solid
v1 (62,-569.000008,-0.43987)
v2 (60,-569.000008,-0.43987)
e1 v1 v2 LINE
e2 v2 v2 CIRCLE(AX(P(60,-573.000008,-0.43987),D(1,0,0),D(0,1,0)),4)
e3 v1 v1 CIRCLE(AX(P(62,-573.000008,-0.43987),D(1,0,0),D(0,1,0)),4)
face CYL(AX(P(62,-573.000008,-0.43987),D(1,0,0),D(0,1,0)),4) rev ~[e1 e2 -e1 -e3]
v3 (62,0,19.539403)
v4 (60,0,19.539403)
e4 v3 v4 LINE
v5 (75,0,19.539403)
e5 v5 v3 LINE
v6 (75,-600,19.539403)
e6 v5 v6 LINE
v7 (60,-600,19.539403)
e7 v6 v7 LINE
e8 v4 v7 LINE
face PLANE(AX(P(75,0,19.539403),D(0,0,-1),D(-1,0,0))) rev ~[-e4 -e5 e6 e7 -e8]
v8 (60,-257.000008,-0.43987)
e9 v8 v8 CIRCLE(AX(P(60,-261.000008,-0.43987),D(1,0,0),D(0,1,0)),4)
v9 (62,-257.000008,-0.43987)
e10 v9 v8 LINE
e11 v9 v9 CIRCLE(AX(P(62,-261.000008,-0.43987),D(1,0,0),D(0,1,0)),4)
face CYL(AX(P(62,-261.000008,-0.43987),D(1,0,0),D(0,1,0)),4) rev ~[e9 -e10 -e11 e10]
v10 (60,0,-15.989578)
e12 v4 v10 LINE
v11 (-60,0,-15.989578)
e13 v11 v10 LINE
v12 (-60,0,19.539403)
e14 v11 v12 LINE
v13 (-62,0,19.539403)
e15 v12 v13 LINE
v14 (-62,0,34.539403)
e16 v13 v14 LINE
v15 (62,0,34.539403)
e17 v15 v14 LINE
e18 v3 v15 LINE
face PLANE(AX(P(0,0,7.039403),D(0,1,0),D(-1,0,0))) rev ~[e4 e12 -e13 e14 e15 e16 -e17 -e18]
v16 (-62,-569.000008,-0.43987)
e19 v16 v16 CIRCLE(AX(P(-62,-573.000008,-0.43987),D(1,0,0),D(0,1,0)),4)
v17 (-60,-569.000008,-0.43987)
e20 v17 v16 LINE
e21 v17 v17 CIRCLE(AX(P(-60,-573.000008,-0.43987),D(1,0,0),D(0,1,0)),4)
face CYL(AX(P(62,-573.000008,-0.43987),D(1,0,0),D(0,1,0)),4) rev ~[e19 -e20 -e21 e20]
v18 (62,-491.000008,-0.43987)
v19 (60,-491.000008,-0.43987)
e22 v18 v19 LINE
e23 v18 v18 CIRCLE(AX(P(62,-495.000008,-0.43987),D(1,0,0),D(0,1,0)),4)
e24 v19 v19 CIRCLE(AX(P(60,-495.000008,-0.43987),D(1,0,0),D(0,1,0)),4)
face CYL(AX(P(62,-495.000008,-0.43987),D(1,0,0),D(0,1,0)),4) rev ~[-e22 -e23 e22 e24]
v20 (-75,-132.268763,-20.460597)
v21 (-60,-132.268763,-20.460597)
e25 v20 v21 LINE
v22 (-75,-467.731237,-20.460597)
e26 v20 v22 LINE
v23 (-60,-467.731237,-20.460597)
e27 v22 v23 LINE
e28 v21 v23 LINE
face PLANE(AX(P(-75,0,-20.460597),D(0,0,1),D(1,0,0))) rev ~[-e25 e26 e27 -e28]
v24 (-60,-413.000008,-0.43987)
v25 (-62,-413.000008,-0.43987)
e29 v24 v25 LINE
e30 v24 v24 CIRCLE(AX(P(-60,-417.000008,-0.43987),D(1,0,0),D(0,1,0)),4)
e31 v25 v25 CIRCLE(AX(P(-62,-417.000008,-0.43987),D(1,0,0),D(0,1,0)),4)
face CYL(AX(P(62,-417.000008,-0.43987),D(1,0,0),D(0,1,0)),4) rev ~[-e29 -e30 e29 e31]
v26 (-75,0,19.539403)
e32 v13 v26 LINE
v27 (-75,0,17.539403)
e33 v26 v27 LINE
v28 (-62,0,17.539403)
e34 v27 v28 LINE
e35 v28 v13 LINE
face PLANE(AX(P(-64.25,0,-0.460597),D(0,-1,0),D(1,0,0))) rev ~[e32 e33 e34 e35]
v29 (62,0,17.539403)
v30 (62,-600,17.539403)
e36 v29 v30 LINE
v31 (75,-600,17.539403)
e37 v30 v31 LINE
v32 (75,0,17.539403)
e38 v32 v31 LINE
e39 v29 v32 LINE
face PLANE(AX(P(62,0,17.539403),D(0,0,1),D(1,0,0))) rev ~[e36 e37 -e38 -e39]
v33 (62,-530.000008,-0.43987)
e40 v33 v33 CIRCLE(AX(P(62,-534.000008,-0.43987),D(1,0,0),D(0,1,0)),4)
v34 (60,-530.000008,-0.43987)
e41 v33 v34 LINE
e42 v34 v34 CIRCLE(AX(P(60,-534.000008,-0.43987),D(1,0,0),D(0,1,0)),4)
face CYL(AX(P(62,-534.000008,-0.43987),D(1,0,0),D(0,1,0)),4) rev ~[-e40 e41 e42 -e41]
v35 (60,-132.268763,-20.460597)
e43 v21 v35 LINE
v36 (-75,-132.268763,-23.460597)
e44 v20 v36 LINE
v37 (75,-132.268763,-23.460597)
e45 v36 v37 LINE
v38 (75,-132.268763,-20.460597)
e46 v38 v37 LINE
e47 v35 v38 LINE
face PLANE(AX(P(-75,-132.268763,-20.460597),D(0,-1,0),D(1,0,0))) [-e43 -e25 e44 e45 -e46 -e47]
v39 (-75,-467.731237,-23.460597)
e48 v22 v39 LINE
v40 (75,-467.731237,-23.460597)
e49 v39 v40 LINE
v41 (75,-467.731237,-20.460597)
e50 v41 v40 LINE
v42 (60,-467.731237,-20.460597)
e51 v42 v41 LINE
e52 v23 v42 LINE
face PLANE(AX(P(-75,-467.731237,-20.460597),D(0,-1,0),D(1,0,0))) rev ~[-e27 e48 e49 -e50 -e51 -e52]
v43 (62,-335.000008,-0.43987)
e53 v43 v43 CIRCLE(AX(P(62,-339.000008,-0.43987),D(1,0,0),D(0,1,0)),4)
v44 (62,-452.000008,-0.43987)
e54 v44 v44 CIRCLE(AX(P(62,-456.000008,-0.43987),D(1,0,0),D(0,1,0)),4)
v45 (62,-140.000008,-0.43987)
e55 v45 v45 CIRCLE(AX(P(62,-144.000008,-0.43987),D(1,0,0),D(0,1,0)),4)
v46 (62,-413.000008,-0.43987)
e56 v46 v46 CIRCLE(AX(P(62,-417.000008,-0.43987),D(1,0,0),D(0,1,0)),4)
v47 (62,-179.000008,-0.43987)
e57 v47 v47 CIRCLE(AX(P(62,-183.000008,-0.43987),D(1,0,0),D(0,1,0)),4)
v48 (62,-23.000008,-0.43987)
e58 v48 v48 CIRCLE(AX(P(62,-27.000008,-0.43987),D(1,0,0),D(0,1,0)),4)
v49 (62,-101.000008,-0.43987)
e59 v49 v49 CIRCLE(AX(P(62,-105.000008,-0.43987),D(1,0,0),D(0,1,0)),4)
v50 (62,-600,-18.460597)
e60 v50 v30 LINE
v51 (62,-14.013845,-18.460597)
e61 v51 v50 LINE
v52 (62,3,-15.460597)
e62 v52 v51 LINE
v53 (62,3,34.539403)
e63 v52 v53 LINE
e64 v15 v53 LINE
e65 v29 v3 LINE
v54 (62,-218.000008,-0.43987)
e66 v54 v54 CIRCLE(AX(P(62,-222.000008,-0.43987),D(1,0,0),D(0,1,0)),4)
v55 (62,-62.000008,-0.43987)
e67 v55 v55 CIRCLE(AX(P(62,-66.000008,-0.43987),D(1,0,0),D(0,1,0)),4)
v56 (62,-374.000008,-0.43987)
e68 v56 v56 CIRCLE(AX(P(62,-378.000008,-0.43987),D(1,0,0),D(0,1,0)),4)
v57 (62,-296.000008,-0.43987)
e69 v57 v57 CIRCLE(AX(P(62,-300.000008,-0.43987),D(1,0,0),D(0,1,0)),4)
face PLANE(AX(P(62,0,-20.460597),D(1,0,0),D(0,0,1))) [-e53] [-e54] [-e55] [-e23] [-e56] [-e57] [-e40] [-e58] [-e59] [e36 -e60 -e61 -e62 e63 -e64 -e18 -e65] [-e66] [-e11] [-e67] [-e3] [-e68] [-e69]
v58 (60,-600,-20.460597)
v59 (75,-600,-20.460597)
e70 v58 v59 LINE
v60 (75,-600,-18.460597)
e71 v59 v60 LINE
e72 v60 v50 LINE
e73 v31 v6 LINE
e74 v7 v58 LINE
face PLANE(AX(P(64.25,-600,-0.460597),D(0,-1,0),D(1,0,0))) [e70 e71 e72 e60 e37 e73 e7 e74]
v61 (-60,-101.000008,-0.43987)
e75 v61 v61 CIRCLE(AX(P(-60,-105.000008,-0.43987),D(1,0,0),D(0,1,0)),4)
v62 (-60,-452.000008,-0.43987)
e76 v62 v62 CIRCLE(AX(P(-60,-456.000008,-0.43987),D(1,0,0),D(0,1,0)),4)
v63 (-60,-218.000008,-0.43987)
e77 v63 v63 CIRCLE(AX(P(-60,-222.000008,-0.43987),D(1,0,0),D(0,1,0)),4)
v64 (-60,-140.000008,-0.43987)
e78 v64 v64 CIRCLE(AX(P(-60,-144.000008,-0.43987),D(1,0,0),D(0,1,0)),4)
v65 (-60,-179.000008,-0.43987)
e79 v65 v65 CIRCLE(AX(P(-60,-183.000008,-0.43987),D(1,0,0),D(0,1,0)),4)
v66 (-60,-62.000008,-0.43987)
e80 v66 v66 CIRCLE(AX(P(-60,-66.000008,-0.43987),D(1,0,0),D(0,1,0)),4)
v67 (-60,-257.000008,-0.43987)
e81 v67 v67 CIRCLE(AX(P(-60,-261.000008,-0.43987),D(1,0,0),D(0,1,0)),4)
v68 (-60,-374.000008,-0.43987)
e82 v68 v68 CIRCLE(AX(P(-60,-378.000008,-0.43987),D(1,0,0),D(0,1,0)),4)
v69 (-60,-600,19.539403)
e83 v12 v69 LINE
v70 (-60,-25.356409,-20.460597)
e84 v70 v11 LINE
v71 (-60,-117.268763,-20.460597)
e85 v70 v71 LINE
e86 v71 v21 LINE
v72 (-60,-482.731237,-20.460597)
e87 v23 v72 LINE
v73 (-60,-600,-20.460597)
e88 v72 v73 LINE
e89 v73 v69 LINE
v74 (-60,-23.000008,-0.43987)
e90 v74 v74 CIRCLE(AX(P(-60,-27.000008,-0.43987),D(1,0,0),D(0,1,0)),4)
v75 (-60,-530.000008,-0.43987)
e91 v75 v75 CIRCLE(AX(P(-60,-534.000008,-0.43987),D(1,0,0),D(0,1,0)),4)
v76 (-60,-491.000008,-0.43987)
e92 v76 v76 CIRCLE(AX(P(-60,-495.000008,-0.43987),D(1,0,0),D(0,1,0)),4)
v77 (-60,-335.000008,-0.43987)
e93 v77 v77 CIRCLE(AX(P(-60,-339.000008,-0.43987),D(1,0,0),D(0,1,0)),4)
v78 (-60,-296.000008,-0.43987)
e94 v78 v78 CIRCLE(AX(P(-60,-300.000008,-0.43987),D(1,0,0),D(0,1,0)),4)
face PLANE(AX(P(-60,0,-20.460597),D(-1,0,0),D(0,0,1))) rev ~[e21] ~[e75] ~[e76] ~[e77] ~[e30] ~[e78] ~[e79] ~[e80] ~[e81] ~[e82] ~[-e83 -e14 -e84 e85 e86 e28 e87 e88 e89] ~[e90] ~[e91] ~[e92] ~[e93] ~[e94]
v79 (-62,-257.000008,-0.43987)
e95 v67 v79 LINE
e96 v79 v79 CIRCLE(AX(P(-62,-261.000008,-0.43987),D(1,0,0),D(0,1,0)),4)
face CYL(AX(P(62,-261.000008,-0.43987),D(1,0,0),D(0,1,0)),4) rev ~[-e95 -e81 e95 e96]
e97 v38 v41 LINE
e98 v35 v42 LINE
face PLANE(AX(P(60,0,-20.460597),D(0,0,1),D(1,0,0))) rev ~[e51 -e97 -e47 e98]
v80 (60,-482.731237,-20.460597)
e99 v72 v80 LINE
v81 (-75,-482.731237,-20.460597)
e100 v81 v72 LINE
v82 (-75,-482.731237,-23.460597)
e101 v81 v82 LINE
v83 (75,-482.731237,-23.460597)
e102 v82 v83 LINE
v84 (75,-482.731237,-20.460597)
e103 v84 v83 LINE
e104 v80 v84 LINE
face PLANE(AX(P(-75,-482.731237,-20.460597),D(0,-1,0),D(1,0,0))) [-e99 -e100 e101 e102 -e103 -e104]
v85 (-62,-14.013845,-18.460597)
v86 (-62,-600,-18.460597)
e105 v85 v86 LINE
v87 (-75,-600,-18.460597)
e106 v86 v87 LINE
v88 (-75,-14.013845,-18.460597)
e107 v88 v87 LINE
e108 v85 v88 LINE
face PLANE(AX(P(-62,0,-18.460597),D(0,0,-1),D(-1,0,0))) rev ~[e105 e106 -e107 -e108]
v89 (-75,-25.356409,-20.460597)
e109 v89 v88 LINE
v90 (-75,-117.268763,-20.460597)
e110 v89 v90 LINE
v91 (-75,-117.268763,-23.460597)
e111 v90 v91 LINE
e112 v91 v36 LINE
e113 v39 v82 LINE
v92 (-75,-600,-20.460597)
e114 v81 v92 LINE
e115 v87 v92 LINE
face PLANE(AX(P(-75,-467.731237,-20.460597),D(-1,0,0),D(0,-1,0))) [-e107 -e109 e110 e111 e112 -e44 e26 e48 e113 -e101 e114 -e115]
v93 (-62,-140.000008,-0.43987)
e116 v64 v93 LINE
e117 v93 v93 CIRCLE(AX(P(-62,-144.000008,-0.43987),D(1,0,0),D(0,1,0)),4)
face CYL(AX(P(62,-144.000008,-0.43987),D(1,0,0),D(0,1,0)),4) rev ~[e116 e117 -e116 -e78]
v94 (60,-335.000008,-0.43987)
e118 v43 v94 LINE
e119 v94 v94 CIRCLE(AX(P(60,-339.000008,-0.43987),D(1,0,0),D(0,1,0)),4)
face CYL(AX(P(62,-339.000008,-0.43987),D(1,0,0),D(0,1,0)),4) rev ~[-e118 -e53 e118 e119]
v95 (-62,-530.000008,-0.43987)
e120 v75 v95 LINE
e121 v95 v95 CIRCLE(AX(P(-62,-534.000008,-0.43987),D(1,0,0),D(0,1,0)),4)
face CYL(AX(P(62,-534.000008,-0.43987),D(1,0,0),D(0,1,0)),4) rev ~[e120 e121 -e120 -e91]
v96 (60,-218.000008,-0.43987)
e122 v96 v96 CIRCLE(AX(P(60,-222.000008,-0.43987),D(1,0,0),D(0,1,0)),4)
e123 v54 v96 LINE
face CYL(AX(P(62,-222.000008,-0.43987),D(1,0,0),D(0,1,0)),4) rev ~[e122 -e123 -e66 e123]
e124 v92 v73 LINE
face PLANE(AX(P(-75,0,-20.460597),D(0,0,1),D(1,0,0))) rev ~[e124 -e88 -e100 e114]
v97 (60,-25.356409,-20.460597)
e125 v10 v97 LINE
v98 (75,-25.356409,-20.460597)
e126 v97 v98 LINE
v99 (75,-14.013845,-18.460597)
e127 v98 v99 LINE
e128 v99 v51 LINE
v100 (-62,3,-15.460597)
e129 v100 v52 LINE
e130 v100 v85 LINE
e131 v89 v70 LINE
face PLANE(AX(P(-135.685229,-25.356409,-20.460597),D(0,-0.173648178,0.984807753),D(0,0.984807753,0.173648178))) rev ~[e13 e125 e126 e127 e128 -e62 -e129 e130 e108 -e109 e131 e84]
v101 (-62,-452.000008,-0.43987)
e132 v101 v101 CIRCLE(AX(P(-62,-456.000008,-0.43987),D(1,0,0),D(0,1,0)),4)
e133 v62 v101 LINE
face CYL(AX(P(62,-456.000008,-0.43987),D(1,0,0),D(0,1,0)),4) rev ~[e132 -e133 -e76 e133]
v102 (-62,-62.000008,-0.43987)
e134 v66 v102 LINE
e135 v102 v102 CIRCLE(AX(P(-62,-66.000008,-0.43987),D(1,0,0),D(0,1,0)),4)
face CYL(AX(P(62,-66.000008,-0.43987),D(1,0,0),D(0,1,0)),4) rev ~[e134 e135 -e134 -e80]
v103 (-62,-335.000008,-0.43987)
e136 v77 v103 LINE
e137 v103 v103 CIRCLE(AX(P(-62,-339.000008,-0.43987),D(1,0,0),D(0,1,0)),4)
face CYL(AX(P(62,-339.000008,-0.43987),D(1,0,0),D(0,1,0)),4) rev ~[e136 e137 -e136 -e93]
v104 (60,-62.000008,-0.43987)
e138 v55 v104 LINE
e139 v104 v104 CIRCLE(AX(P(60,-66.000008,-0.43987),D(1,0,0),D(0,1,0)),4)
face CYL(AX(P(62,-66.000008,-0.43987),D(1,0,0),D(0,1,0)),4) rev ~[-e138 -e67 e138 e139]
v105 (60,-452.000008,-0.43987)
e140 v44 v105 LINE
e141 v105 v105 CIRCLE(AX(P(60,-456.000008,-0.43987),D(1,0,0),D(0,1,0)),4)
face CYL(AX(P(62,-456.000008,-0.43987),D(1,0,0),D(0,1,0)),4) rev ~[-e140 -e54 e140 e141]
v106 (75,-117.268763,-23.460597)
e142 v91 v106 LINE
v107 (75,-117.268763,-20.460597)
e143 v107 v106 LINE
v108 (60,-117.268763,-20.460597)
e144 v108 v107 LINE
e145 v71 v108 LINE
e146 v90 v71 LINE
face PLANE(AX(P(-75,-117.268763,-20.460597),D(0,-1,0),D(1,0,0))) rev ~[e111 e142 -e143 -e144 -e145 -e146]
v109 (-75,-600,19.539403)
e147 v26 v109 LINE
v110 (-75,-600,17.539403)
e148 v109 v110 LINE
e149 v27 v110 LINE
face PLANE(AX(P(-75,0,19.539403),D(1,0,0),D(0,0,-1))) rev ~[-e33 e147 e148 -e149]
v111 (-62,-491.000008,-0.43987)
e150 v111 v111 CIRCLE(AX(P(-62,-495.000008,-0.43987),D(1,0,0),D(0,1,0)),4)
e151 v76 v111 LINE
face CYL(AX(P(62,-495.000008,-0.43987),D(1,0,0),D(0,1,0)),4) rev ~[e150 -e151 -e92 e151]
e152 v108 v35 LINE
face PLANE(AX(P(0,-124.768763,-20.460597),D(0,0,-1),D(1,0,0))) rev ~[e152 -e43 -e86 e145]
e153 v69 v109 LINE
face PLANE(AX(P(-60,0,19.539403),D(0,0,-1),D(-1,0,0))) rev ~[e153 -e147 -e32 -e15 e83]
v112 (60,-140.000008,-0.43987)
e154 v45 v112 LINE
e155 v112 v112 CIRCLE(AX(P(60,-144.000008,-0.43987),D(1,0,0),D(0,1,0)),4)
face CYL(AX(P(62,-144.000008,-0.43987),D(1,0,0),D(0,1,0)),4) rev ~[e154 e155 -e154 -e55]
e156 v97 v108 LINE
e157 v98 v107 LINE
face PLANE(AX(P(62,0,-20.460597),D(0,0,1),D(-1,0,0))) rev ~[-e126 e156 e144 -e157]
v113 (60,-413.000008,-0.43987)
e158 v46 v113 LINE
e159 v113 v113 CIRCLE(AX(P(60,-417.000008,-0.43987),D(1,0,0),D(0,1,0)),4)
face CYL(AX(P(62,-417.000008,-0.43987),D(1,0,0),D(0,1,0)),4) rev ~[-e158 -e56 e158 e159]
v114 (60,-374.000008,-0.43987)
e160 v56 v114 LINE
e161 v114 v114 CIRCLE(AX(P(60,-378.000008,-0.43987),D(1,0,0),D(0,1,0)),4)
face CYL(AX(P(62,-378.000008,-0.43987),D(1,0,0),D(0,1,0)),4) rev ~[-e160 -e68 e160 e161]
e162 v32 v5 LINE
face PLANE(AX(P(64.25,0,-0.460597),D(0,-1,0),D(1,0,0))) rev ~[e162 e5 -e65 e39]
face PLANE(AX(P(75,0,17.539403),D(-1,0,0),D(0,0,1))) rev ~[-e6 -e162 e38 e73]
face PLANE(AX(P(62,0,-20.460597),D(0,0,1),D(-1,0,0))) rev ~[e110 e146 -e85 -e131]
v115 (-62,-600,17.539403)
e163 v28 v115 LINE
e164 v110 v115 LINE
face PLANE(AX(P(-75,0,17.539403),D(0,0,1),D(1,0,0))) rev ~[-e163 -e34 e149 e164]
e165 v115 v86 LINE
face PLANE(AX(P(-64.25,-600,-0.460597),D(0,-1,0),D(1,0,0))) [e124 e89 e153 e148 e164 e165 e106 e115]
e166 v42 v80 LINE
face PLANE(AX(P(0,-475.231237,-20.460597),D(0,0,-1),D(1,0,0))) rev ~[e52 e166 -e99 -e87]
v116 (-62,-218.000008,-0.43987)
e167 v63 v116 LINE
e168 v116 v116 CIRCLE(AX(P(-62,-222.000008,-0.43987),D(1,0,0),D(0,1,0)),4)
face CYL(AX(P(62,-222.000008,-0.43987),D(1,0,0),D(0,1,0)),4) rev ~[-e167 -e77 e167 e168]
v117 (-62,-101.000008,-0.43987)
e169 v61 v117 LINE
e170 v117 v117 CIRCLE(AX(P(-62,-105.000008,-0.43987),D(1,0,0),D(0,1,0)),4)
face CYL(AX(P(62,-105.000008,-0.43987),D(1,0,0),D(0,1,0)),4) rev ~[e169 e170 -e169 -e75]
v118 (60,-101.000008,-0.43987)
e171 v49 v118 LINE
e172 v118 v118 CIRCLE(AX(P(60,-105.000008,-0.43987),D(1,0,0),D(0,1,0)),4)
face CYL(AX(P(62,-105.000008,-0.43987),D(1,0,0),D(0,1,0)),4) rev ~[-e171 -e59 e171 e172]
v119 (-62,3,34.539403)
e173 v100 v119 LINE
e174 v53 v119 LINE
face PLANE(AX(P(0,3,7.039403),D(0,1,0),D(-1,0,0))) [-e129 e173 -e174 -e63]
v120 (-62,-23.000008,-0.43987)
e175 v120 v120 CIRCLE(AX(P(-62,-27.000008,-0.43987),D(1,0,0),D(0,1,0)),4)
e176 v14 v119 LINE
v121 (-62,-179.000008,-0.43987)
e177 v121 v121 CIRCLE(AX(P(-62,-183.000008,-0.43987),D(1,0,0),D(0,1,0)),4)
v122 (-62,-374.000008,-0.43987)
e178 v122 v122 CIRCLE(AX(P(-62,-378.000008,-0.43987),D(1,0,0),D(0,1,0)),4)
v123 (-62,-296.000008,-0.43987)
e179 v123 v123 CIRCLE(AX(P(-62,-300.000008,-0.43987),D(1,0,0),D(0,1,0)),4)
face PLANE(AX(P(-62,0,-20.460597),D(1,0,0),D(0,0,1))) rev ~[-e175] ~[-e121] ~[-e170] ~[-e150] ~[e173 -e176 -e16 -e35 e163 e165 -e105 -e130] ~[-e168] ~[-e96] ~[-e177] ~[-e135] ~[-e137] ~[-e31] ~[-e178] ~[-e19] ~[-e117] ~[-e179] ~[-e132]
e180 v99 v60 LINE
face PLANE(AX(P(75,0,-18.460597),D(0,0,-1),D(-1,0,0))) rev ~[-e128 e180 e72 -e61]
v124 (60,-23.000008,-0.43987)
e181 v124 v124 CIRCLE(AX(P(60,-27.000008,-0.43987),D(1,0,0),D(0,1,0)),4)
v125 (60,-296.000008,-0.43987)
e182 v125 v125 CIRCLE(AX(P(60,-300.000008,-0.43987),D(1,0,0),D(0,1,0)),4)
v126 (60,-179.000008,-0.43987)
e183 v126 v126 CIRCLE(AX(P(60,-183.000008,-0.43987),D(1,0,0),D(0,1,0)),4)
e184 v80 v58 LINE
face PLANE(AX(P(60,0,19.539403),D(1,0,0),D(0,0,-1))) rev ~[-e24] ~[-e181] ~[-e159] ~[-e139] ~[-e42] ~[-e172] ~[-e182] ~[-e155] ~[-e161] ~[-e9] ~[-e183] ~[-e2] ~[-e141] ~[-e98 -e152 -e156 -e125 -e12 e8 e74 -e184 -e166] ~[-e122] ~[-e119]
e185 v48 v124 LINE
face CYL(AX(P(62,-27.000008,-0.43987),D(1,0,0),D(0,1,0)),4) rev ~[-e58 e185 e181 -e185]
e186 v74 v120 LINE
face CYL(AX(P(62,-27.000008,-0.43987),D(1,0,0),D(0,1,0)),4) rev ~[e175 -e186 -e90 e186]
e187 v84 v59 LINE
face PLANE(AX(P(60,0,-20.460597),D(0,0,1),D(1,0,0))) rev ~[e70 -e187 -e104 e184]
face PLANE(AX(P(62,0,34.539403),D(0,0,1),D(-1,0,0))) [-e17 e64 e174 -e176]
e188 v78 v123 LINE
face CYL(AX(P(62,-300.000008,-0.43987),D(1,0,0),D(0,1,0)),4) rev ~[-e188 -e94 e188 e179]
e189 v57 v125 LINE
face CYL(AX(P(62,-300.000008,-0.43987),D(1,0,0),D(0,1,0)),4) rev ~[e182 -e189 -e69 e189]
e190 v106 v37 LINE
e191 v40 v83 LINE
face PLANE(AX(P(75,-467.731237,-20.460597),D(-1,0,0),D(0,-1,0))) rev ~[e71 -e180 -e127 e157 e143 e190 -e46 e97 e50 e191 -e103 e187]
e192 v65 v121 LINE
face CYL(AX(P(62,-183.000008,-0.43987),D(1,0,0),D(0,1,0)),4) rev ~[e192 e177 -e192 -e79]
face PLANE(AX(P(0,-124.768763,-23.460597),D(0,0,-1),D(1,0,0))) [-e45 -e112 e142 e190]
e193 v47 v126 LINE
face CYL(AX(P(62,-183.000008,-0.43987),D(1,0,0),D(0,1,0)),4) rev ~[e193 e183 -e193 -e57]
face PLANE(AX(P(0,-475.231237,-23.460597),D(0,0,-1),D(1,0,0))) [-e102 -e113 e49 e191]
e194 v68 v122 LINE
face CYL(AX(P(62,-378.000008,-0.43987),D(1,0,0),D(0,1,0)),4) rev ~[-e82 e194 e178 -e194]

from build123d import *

# Parameters (mm, degrees)
F1_DEPTH    = 600
F2_R        = 4
F3_DEPTH    = 124
F5_W        = 150
F5_H        = 15
F6_DEPTH    = 3
F4_W        = 124
F4_H        = 55
F7_DEPTH    = 3
F8_T1_DEPTH = 271.3704583371


# Not quite as in the source:
# - a fillet or chamfer that OpenCascade refuses, or shapes differently, is made with other operations: its cross-section is extruded or revolved along the edge and cut away or added


with BuildPart() as f1:
    # F0 (on Front) → F1 (new body)
    with BuildSketch(Plane.XZ):
        Polygon((75, 17.5394031256), (75, 19.5394031256), (60, 19.5394031256), (60, -20.4605968744), (75, -20.4605968744), (75, -18.4605968744), (62, -18.4605968744), (62, 17.5394031256), align=None)
    extrude(amount=F1_DEPTH)


with BuildPart() as f1b:
    # F0 (on Front) → F1, piece 2 (new body)
    with BuildSketch(Plane.XZ):
        Polygon((-62, -18.4605968744), (-75, -18.4605968744), (-75, -20.4605968744), (-60, -20.4605968744), (-60, 19.5394031256), (-75, 19.5394031256), (-75, 17.5394031256), (-62, 17.5394031256), align=None)
    extrude(amount=F1_DEPTH)


with BuildPart() as f3_tool:
    # F2 (on face) → F3 (new body, through all)
    with BuildSketch(Plane.YZ.offset(62)):
        with Locations((-573.0000079556, -0.4398700211)):
            Circle(F2_R)
        with Locations((-534.0000079556, -0.4398700211)):
            Circle(F2_R)
        with Locations((-495.0000079556, -0.4398700211)):
            Circle(F2_R)
        with Locations((-456.0000079556, -0.4398700211)):
            Circle(F2_R)
        with Locations((-417.0000079556, -0.4398700211)):
            Circle(F2_R)
        with Locations((-378.0000079556, -0.4398700211)):
            Circle(F2_R)
        with Locations((-339.0000079556, -0.4398700211)):
            Circle(F2_R)
        with Locations((-300.0000079556, -0.4398700211)):
            Circle(F2_R)
        with Locations((-261.0000079556, -0.4398700211)):
            Circle(F2_R)
        with Locations((-222.0000079556, -0.4398700211)):
            Circle(F2_R)
        with Locations((-183.0000079556, -0.4398700211)):
            Circle(F2_R)
        with Locations((-144.0000079556, -0.4398700211)):
            Circle(F2_R)
        with Locations((-105.0000079556, -0.4398700211)):
            Circle(F2_R)
        with Locations((-66.0000079556, -0.4398700211)):
            Circle(F2_R)
        with Locations((-27.0000079556, -0.4398700211)):
            Circle(F2_R)
    extrude(amount=-F3_DEPTH)


with BuildPart() as f1_1:
    add(f1.part)

    # F3: cut by f3_tool
    add(f3_tool.part, mode=Mode.SUBTRACT)



with BuildPart() as f1b_1:
    add(f1b.part)

    # F3: cut by f3_tool
    add(f3_tool.part, mode=Mode.SUBTRACT)


with BuildPart() as f1_2:
    add(f1_1.part)

    add(f1b_1.part)  # F6 merges F1b
    # F5 (on face) → F6 (join)
    with BuildSketch(Plane(origin=(0, 0, -20.4605968744), x_dir=(1, 0, 0), z_dir=(0, 0, -1))):
        with Locations((0, 475.2312374115)):
            Rectangle(F5_W, F5_H)
        with Locations((0, 124.7687625885)):
            Rectangle(F5_W, F5_H)
    extrude(amount=F6_DEPTH)

    # F4 (on face) → F7 (join)
    with BuildSketch(Plane(origin=(0, 0, 0), x_dir=(-1, 0, 0), z_dir=(0, 1, 0))):
        with Locations((0, 7.0394031256)):
            Rectangle(F4_W, F4_H)
    extrude(amount=F7_DEPTH)

    # F8: chamfer of 5 x 28.3564090981 on 1 edges, made by hand

    # F8_s2 → F8_t1 (cut)
    with BuildSketch(Plane.YZ.offset(-135.6852291686)):
        Polygon((-25.3564090981, -20.4605968744), (3, -15.4605968744), (3, -20.4605968744), align=None)
    extrude(amount=F8_T1_DEPTH, mode=Mode.SUBTRACT)


solid = f1_2.part
